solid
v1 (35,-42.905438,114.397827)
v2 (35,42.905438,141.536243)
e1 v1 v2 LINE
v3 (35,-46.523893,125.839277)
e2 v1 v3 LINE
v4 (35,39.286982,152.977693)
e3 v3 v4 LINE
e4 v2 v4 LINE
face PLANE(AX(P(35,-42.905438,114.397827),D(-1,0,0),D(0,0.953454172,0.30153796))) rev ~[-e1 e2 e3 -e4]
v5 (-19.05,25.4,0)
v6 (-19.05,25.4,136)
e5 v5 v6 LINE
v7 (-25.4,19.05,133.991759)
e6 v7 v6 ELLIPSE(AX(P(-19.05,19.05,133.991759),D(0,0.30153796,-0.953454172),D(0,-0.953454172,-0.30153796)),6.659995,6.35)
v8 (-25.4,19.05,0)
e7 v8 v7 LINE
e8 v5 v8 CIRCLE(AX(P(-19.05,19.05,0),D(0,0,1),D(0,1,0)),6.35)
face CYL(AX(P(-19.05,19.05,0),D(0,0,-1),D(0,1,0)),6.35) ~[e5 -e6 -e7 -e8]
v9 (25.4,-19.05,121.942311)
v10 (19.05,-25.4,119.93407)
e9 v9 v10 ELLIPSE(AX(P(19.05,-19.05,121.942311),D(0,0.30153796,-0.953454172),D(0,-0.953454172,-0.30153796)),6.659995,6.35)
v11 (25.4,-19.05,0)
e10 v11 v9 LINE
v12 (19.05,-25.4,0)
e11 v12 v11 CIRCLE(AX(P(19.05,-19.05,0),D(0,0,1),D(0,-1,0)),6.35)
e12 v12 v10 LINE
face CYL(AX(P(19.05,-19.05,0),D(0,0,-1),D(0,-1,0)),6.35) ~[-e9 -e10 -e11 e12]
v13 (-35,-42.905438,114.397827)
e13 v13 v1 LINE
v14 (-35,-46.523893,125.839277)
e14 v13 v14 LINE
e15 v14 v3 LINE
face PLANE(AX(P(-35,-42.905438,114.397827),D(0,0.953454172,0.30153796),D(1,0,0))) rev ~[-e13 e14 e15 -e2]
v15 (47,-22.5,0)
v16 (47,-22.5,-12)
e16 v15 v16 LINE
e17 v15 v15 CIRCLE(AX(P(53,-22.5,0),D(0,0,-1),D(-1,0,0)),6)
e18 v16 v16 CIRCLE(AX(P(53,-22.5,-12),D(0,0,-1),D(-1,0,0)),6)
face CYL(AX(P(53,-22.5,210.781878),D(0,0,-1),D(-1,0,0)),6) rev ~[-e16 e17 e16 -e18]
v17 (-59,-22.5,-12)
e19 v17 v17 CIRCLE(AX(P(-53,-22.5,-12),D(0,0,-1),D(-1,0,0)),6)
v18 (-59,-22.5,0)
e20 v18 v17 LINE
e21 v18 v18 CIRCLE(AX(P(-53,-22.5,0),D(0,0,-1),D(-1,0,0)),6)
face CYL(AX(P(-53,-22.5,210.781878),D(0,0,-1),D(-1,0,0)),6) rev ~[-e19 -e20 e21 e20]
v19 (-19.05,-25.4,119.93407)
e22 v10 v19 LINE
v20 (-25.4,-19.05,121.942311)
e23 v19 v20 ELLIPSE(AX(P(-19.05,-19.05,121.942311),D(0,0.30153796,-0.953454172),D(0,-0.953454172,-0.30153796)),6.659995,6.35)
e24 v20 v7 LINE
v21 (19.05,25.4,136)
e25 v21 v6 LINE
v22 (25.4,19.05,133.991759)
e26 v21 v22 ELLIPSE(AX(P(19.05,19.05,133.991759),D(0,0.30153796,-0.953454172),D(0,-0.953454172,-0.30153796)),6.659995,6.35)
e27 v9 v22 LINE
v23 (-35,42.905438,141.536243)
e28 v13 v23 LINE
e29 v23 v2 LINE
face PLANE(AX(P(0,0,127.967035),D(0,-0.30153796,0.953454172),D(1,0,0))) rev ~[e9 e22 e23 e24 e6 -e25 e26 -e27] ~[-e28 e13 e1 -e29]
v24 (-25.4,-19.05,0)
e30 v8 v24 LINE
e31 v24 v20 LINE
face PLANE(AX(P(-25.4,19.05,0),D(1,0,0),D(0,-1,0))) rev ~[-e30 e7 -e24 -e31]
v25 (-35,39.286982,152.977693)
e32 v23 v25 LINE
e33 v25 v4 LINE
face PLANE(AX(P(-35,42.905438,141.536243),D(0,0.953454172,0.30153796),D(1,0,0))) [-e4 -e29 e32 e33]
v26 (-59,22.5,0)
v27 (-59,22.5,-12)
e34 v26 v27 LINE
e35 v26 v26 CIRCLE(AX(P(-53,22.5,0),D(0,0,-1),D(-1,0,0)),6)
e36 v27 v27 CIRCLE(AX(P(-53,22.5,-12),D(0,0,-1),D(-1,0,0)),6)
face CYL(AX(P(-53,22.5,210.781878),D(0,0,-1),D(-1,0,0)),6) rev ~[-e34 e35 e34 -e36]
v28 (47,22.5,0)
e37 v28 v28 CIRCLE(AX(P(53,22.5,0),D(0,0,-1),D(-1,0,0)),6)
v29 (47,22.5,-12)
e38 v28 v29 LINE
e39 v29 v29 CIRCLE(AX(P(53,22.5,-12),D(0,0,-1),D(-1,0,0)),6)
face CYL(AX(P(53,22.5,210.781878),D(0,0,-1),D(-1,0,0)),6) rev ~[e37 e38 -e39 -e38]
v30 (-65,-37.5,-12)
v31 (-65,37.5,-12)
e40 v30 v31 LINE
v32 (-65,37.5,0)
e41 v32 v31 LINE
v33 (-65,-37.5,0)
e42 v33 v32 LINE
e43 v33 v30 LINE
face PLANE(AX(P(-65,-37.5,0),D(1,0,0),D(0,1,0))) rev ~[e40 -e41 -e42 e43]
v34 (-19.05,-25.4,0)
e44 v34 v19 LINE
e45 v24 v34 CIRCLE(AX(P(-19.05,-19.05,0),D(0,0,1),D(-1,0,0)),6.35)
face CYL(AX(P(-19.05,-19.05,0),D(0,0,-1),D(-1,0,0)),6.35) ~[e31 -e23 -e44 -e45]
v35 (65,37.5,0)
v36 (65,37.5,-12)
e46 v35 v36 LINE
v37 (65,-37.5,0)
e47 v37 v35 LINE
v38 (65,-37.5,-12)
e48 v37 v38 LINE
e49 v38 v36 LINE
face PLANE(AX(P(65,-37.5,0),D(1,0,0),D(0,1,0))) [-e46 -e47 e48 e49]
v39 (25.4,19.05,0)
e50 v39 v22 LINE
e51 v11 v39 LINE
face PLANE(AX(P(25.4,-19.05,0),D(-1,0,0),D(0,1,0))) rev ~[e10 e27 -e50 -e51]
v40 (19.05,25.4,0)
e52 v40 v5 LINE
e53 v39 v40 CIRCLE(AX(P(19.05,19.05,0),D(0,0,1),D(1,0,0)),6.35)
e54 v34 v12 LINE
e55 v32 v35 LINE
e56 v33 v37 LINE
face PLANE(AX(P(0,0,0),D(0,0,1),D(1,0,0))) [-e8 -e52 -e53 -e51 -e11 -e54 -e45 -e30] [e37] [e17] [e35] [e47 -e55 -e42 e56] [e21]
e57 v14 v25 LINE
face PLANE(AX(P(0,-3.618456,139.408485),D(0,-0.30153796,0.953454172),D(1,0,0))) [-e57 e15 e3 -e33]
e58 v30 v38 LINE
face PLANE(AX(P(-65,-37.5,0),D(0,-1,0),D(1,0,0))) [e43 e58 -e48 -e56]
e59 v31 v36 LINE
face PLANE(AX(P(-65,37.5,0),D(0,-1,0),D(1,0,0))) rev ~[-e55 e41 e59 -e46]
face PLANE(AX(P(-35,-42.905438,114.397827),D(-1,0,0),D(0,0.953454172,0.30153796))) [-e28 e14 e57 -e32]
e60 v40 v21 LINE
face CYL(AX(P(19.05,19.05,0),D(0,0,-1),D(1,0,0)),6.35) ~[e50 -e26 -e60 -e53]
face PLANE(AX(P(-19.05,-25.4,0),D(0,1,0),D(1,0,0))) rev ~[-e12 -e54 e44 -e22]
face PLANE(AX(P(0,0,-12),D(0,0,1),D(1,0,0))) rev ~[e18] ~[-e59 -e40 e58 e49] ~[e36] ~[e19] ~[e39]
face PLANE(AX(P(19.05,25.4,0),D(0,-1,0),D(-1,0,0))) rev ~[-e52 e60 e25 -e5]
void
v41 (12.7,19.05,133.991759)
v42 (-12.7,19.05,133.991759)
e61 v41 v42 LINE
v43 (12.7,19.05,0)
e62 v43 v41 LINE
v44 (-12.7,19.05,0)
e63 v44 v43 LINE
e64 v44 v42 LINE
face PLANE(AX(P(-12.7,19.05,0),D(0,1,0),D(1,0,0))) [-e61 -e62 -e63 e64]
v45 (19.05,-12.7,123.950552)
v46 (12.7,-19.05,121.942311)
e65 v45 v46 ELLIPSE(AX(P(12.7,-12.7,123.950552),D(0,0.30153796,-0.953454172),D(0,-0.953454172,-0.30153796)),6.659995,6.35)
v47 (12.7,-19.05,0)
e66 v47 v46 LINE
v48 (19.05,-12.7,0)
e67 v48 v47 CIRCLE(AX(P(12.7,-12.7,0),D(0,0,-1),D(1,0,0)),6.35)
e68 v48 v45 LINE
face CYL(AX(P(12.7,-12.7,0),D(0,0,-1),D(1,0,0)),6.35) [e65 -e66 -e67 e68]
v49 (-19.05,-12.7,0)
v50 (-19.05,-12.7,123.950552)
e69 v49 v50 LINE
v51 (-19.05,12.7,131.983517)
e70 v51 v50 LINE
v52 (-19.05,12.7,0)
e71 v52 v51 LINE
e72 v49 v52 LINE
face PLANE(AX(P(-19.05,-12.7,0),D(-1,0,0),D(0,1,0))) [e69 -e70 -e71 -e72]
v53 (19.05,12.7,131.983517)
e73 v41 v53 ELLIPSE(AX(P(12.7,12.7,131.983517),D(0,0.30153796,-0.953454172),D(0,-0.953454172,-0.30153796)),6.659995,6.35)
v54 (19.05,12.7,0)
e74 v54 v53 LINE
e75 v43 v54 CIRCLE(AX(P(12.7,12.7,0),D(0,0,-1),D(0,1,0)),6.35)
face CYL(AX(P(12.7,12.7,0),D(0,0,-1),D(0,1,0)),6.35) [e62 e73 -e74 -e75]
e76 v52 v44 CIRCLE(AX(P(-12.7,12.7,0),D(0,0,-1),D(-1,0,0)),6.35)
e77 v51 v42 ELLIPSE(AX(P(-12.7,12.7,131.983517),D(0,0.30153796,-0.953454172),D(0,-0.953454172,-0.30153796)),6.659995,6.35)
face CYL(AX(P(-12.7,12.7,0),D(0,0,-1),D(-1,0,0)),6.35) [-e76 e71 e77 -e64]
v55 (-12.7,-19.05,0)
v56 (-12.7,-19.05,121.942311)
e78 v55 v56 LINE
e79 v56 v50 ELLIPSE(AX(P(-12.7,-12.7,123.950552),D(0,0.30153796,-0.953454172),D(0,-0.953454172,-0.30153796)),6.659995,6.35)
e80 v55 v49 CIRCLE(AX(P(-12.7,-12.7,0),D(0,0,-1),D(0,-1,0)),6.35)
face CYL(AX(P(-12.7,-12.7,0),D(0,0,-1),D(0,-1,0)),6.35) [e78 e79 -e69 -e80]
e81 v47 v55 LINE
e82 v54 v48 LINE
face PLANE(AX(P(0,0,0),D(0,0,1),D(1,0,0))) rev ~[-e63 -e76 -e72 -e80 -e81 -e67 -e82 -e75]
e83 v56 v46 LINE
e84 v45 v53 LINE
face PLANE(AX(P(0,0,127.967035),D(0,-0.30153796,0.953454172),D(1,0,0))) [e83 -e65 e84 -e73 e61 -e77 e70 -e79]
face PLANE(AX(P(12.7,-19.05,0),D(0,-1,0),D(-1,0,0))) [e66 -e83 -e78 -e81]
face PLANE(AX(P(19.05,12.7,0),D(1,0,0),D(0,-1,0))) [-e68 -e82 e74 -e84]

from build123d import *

# Parameters (mm, degrees)
F0_W     = 130
F0_H     = 75
F1_DEPTH = 12
F3_DEPTH = 136
F5_D     = 12
F7_DEPTH = 50.8
F8_W     = 70
F8_H     = 90
F9_DEPTH = 12


with BuildPart() as f1:
    # F0 (on Top) → F1 (new body)
    with BuildSketch(Plane.XY):
        Rectangle(F0_W, F0_H)
    extrude(amount=-F1_DEPTH)

    # F2 (on face) → F3 (join)
    with BuildSketch(Plane.XY):
        with BuildLine():
            Line((-19.05, -25.4), (19.05, -25.4))
            ThreePointArc((19.05, -25.4), (23.5401280605, -23.5401280605), (25.4, -19.05))
            Line((25.4, -19.05), (25.4, 19.05))
            ThreePointArc((25.4, 19.05), (23.5401280605, 23.5401280605), (19.05, 25.4))
            Line((19.05, 25.4), (-19.05, 25.4))
            ThreePointArc((-19.05, 25.4), (-23.5401280605, 23.5401280605), (-25.4, 19.05))
            Line((-25.4, 19.05), (-25.4, -19.05))
            ThreePointArc((-25.4, -19.05), (-23.5401280605, -23.5401280605), (-19.05, -25.4))
        make_face()
        with BuildLine():
            Line((-12.7, 19.05), (12.7, 19.05))
            ThreePointArc((12.7, 19.05), (17.1901280605, 17.1901280605), (19.05, 12.7))
            Line((19.05, 12.7), (19.05, -12.7))
            ThreePointArc((19.05, -12.7), (17.1901280605, -17.1901280605), (12.7, -19.05))
            Line((12.7, -19.05), (-12.7, -19.05))
            ThreePointArc((-12.7, -19.05), (-17.1901280605, -17.1901280605), (-19.05, -12.7))
            Line((-19.05, -12.7), (-19.05, 12.7))
            ThreePointArc((-19.05, 12.7), (-17.1901280605, 17.1901280605), (-12.7, 19.05))
        make_face(mode=Mode.SUBTRACT)
    extrude(amount=F3_DEPTH)

    # F5 (through all)
    with Locations(Plane.XY):
        with Locations((-53, 22.5), (53, 22.5), (53, -22.5), (-53, -22.5)):
            Hole(F5_D / 2)

    # F6 (on face) → F7 (cut)
    with BuildSketch(Plane.YZ.offset(25.4)):
        Polygon((-19.05, 136), (-25.4, 136), (-25.4, 119.9340696072), (-19.05, 121.9423109063), align=None)
        Polygon((19.05, 136), (-19.05, 136), (-19.05, 121.9423109063), (19.05, 133.9917587009), align=None)
        Polygon((25.4, 136), (19.05, 136), (19.05, 133.9917587009), align=None)
    extrude(amount=-F7_DEPTH, mode=Mode.SUBTRACT)

    # F8 (on face) → F9 (join)
    with BuildSketch(Plane(origin=(0, -36.7908585502, 116.331614084), x_dir=(1, 0, 0), z_dir=(0, -0.3015379599, 0.9534541723))):
        with Locations((0, 38.5869186148)):
            Rectangle(F8_W, F8_H)
        with BuildLine():
            Line((25.4, 58.5669035507), (25.4, 18.6069336789))
            add(Edge.make_bspline(
                [(25.4, 18.6069336789), (25.4, 11.9469387003), (19.05, 11.9469387003)],
                knots=[4.7123889804, 4.7123889804, 4.7123889804, 6.2831853072, 6.2831853072, 6.2831853072], degree=2, weights=[1, 0.7071067812, 1]))
            Line((19.05, 11.9469387003), (-19.05, 11.9469387003))
            add(Edge.make_bspline(
                [(-19.05, 11.9469387003), (-25.4, 11.9469387003), (-25.4, 18.6069336789)],
                knots=[0, 0, 0, 1.5707963268, 1.5707963268, 1.5707963268], degree=2, weights=[1, 0.7071067812, 1]))
            Line((-25.4, 18.6069336789), (-25.4, 58.5669035507))
            add(Edge.make_bspline(
                [(-25.4, 58.5669035507), (-25.4, 65.2268985294), (-19.05, 65.2268985294)],
                knots=[1.5707963268, 1.5707963268, 1.5707963268, 3.1415926536, 3.1415926536, 3.1415926536], degree=2, weights=[1, 0.7071067812, 1]))
            Line((-19.05, 65.2268985294), (19.05, 65.2268985294))
            add(Edge.make_bspline(
                [(19.05, 65.2268985294), (25.4, 65.2268985294), (25.4, 58.5669035507)],
                knots=[3.1415926536, 3.1415926536, 3.1415926536, 4.7123889804, 4.7123889804, 4.7123889804], degree=2, weights=[1, 0.7071067812, 1]))
        make_face(mode=Mode.SUBTRACT)
        with BuildLine():
            add(Edge.make_bspline(
                [(25.4, 18.6069336789), (25.4, 11.9469387003), (19.05, 11.9469387003)],
                knots=[4.7123889804, 4.7123889804, 4.7123889804, 6.2831853072, 6.2831853072, 6.2831853072], degree=2, weights=[1, 0.7071067812, 1]))
            Line((25.4, 18.6069336789), (25.4, 58.5669035507))
            add(Edge.make_bspline(
                [(19.05, 65.2268985294), (25.4, 65.2268985294), (25.4, 58.5669035507)],
                knots=[3.1415926536, 3.1415926536, 3.1415926536, 4.7123889804, 4.7123889804, 4.7123889804], degree=2, weights=[1, 0.7071067812, 1]))
            Line((19.05, 65.2268985294), (-19.05, 65.2268985294))
            add(Edge.make_bspline(
                [(-25.4, 58.5669035507), (-25.4, 65.2268985294), (-19.05, 65.2268985294)],
                knots=[1.5707963268, 1.5707963268, 1.5707963268, 3.1415926536, 3.1415926536, 3.1415926536], degree=2, weights=[1, 0.7071067812, 1]))
            Line((-25.4, 58.5669035507), (-25.4, 18.6069336789))
            add(Edge.make_bspline(
                [(-19.05, 11.9469387003), (-25.4, 11.9469387003), (-25.4, 18.6069336789)],
                knots=[0, 0, 0, 1.5707963268, 1.5707963268, 1.5707963268], degree=2, weights=[1, 0.7071067812, 1]))
            Line((-19.05, 11.9469387003), (19.05, 11.9469387003))
        make_face()
        with BuildLine():
            Line((-19.05, 25.2669286576), (-19.05, 51.9069085721))
            add(Edge.make_bspline(
                [(-19.05, 51.9069085721), (-19.05, 58.5669035507), (-12.7, 58.5669035507)],
                knots=[1.5707963268, 1.5707963268, 1.5707963268, 3.1415926536, 3.1415926536, 3.1415926536], degree=2, weights=[1, 0.7071067812, 1]))
            Line((-12.7, 58.5669035507), (12.7, 58.5669035507))
            add(Edge.make_bspline(
                [(12.7, 58.5669035507), (19.05, 58.5669035507), (19.05, 51.9069085721)],
                knots=[3.1415926536, 3.1415926536, 3.1415926536, 4.7123889804, 4.7123889804, 4.7123889804], degree=2, weights=[1, 0.7071067812, 1]))
            Line((19.05, 51.9069085721), (19.05, 25.2669286576))
            add(Edge.make_bspline(
                [(19.05, 25.2669286576), (19.05, 18.6069336789), (12.7, 18.6069336789)],
                knots=[4.7123889804, 4.7123889804, 4.7123889804, 6.2831853072, 6.2831853072, 6.2831853072], degree=2, weights=[1, 0.7071067812, 1]))
            Line((12.7, 18.6069336789), (-12.7, 18.6069336789))
            add(Edge.make_bspline(
                [(-12.7, 18.6069336789), (-19.05, 18.6069336789), (-19.05, 25.2669286576)],
                knots=[0, 0, 0, 1.5707963268, 1.5707963268, 1.5707963268], degree=2, weights=[1, 0.7071067812, 1]))
        make_face(mode=Mode.SUBTRACT)
        with BuildLine():
            add(Edge.make_bspline(
                [(-19.05, 51.9069085721), (-19.05, 58.5669035507), (-12.7, 58.5669035507)],
                knots=[1.5707963268, 1.5707963268, 1.5707963268, 3.1415926536, 3.1415926536, 3.1415926536], degree=2, weights=[1, 0.7071067812, 1]))
            Line((-19.05, 51.9069085721), (-19.05, 25.2669286576))
            add(Edge.make_bspline(
                [(-12.7, 18.6069336789), (-19.05, 18.6069336789), (-19.05, 25.2669286576)],
                knots=[0, 0, 0, 1.5707963268, 1.5707963268, 1.5707963268], degree=2, weights=[1, 0.7071067812, 1]))
            Line((-12.7, 18.6069336789), (12.7, 18.6069336789))
            add(Edge.make_bspline(
                [(19.05, 25.2669286576), (19.05, 18.6069336789), (12.7, 18.6069336789)],
                knots=[4.7123889804, 4.7123889804, 4.7123889804, 6.2831853072, 6.2831853072, 6.2831853072], degree=2, weights=[1, 0.7071067812, 1]))
            Line((19.05, 25.2669286576), (19.05, 51.9069085721))
            add(Edge.make_bspline(
                [(12.7, 58.5669035507), (19.05, 58.5669035507), (19.05, 51.9069085721)],
                knots=[3.1415926536, 3.1415926536, 3.1415926536, 4.7123889804, 4.7123889804, 4.7123889804], degree=2, weights=[1, 0.7071067812, 1]))
            Line((12.7, 58.5669035507), (-12.7, 58.5669035507))
        make_face()
    extrude(amount=F9_DEPTH)


solid = f1.part
